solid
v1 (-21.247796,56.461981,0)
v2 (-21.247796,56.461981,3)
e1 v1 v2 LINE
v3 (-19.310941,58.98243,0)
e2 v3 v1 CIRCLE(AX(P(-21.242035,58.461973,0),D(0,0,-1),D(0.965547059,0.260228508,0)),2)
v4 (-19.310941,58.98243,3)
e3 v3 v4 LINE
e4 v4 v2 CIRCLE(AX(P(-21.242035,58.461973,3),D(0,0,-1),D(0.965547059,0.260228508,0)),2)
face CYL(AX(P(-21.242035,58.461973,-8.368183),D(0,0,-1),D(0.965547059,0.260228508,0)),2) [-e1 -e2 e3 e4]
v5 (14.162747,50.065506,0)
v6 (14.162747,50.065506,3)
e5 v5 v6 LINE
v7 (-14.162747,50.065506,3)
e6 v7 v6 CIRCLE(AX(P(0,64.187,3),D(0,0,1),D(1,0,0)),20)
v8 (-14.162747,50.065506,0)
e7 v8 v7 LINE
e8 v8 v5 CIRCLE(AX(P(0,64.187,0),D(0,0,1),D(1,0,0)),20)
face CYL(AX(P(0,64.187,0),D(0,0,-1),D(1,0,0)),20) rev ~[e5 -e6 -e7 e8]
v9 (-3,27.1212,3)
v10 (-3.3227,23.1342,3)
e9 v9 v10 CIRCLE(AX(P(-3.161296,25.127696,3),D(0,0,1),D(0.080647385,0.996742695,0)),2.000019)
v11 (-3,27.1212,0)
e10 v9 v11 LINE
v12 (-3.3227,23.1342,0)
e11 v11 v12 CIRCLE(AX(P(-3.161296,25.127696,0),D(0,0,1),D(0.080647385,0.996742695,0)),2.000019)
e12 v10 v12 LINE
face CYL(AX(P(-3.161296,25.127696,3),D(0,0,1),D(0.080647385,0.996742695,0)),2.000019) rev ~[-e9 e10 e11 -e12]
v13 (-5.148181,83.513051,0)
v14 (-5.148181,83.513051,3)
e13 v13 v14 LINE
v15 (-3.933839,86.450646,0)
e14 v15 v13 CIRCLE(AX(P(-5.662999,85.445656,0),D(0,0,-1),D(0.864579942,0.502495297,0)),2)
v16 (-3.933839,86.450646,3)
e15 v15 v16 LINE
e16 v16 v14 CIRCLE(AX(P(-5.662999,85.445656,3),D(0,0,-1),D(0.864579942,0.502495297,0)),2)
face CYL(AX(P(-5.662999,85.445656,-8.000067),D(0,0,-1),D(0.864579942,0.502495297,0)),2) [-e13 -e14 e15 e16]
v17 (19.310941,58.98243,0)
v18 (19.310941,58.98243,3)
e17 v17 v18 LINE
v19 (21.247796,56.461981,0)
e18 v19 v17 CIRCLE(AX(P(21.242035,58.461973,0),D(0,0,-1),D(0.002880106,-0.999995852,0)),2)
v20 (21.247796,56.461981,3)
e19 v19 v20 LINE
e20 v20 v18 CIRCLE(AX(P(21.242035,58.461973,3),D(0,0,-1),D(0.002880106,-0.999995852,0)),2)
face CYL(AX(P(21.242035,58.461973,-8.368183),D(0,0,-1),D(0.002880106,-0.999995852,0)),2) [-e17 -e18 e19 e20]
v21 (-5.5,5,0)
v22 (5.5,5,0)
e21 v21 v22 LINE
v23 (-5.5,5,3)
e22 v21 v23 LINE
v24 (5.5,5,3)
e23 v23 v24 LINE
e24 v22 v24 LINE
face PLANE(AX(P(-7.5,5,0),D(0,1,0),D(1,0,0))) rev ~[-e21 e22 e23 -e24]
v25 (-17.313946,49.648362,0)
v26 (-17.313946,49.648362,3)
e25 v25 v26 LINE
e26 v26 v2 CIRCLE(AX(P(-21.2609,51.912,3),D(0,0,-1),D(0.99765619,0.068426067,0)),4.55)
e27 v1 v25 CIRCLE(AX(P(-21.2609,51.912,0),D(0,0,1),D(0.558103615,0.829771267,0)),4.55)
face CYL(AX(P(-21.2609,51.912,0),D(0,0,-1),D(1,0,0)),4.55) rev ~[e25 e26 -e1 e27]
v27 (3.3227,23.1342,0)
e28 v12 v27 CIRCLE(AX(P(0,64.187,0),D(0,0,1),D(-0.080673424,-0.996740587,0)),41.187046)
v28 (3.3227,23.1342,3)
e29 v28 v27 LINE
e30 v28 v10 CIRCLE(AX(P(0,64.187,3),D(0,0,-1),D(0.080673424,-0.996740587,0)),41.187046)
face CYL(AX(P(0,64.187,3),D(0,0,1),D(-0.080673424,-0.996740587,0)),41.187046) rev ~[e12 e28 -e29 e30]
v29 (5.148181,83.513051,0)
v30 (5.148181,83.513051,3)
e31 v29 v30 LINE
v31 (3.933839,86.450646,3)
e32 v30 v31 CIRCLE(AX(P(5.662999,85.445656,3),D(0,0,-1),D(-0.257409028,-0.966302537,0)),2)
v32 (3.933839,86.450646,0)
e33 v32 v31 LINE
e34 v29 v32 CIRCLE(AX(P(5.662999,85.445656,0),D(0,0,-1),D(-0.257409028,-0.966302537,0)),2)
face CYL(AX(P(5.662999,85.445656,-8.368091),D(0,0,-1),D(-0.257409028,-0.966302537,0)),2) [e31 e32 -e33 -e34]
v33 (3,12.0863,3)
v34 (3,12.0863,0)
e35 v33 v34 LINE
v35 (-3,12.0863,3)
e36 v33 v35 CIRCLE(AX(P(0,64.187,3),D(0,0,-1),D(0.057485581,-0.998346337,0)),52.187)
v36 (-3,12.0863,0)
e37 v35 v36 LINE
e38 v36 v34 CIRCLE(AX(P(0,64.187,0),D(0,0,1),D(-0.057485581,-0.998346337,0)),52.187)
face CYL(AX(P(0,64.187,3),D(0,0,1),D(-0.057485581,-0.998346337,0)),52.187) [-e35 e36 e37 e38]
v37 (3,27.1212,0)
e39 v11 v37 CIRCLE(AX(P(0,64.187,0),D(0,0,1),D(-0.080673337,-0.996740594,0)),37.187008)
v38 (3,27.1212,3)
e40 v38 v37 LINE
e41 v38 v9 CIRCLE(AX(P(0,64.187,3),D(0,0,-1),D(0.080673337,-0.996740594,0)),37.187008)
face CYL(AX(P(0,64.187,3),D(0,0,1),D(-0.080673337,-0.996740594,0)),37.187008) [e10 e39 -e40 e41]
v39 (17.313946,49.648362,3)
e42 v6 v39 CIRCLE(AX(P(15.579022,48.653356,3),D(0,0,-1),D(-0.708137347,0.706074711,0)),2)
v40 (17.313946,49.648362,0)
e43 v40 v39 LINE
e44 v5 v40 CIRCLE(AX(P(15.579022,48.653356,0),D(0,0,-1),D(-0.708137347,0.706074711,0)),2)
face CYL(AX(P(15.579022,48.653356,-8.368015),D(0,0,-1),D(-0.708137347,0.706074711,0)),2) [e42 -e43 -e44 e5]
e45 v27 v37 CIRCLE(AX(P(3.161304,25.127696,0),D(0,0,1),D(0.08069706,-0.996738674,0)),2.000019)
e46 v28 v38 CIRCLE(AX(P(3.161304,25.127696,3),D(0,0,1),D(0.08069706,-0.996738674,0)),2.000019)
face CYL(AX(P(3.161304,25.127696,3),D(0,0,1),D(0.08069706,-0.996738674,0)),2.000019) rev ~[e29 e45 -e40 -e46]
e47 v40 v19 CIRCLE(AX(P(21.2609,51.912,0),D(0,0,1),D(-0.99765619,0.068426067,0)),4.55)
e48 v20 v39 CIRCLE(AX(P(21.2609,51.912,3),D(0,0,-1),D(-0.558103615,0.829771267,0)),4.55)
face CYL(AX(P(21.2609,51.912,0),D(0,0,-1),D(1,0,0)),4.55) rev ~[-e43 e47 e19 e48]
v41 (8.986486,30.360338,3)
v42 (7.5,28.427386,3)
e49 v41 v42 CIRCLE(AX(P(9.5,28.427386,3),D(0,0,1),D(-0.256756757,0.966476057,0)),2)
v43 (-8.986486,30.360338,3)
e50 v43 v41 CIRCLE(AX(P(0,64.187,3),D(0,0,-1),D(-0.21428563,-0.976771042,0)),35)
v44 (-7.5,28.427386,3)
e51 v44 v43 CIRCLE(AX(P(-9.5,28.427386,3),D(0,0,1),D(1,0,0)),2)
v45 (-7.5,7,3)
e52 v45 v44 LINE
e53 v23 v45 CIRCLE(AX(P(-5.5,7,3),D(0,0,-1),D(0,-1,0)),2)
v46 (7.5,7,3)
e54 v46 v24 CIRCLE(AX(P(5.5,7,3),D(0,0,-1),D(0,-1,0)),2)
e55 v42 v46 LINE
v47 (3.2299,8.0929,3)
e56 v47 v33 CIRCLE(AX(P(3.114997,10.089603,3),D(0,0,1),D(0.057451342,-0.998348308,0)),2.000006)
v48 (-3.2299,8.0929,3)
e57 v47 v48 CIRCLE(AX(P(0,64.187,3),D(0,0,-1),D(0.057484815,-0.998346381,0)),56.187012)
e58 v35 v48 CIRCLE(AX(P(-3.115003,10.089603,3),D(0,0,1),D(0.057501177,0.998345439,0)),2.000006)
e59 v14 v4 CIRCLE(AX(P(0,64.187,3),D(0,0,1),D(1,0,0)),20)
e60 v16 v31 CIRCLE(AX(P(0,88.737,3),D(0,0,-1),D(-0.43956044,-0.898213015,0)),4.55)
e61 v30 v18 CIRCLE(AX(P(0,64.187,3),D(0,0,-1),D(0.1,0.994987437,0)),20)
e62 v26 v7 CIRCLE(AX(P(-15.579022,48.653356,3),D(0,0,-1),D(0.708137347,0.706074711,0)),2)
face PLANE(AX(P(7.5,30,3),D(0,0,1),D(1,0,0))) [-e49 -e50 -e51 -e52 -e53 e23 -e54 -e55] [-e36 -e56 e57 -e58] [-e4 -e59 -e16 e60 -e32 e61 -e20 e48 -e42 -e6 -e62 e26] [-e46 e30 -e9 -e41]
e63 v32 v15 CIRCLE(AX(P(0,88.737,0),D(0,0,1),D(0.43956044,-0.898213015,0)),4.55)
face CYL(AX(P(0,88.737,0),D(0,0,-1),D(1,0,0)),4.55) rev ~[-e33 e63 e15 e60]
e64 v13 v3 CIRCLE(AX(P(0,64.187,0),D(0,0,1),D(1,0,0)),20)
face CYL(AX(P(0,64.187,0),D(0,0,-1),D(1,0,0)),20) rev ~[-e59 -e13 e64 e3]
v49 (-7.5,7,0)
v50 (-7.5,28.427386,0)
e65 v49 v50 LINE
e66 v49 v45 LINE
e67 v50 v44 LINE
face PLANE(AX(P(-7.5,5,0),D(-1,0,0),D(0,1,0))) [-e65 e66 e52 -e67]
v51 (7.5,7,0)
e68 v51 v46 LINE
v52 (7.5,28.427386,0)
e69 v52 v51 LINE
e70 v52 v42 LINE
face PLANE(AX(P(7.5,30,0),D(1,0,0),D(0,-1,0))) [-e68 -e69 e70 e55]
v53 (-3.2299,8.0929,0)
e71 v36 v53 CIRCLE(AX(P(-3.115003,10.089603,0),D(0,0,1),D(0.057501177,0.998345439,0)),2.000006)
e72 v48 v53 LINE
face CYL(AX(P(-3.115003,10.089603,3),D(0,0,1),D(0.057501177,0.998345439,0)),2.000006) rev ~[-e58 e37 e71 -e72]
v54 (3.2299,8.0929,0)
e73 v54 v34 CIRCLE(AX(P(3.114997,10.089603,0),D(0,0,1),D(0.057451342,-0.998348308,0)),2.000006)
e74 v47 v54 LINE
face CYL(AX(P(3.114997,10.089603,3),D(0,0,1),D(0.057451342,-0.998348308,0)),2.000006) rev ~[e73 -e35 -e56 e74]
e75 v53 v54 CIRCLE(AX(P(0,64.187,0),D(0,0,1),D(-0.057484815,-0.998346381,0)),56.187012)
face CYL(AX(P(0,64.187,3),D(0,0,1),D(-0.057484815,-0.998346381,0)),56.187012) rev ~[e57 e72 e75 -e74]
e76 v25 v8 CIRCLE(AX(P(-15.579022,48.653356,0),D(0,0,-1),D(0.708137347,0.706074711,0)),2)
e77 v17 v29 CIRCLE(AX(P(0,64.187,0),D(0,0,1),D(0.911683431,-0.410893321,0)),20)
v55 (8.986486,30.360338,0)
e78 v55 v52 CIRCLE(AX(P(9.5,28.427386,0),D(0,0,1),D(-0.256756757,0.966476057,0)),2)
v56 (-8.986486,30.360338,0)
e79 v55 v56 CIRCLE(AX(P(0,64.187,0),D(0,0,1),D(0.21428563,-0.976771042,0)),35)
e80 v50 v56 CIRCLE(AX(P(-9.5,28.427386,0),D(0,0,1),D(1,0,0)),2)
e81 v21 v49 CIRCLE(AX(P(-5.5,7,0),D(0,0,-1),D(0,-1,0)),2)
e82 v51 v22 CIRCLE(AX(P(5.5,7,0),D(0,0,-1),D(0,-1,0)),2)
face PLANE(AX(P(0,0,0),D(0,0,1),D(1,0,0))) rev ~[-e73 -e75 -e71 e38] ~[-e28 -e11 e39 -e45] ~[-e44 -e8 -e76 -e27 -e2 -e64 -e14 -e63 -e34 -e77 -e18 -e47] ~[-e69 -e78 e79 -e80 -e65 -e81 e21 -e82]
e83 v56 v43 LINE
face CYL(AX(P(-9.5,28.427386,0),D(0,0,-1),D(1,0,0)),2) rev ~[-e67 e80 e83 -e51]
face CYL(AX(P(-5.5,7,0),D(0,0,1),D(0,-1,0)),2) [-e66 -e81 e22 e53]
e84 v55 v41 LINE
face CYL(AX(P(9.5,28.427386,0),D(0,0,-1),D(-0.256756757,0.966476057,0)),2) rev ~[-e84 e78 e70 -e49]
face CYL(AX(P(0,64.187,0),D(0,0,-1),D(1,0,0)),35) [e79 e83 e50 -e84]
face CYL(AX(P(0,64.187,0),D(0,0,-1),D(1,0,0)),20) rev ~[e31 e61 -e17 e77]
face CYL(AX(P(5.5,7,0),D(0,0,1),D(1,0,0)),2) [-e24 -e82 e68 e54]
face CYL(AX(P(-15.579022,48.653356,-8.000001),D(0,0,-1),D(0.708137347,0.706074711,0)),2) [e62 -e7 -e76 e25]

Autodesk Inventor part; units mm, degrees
ref_plane "YZ Plane" through (0, 0, 0) normal (1, 0, 0) x (0, 1, 0)
ref_plane "XZ Plane" through (0, 0, 0) normal (0, 1, 0) x (-1, 0, 0)
ref_plane "XY Plane" through (0, 0, 0) normal (0, 0, 1) x (1, 0, 0)
sketch "Эскиз1" plane through (0, 0, 0) normal (0, 0, 1) x (1, 0, 0)
  line L0 (17.5, 5) -> (-17.5, 5) construction
  line L1 (-17.5, 5) -> (-17.5, -5) construction
  line L2 (-17.5, -5) -> (17.5, -5) construction
  line L3 (17.5, -5) -> (17.5, 5) construction
  line L4 (17.5, 5) -> (-17.5, -5) construction
  line L5 (-17.5, 5) -> (17.5, -5) construction
  line L6 (12.8471, 5) -> (-11.1661, 5) construction
  circle A0 centre (0, 64.187) radius 35
  circle A1 centre (0, 64.187) radius 20
  line L7 (0, 64.187) -> (0, 0) construction
  circle A2 centre (0, 88.737) radius 4.55
  line L8 (-7.5, 5) -> (-7.5, 30)
  line L9 (7.5, 30) -> (7.5, 5)
  line L10 (-2, 49.2906) -> (2, 49.2906) construction
  line L11 (-7.5, 5) -> (7.5, 5)
  line L12 (-2, 85.687) -> (2, 85.687)
  line L13 (2, 85.687) -> (2, 82.687)
  line L14 (2, 82.687) -> (-2, 82.687)
  line L15 (-2, 82.687) -> (-2, 85.687)
  line L16 (-2, 85.687) -> (2, 82.687) construction
  line L17 (2, 85.687) -> (-2, 82.687) construction
  line L18 (-17.6195, 51.7049) -> (-19.6195, 55.169)
  circle A3 centre (-21.2609, 51.912) radius 4.55
  line L19 (-17.0215, 56.669) -> (-15.0215, 53.2049)
  line L20 (-19.6195, 55.169) -> (-17.0215, 56.669)
  line L21 (-15.0215, 53.2049) -> (-17.6195, 51.7049)
  line L22 (19.6195, 55.169) -> (17.6195, 51.7049)
  circle A4 centre (21.2609, 51.912) radius 4.55
  line L23 (15.0215, 53.2049) -> (17.0215, 56.669)
  line L24 (17.6195, 51.7049) -> (15.0215, 53.2049)
  line L25 (17.0215, 56.669) -> (19.6195, 55.169)
  point P0 (0, 89.2906)
  point P1 (0, 84.187)
  point P2 (-17.3205, 54.187)
  point P3 (17.3205, 54.187)
  point P4 (18.2337, 55.9692)
  point P5 (18.7216, 55.6875)
  point P6 (16.7216, 52.2234)
  point P7 (16.2337, 52.5051)
  point P8 (-16.2337, 52.5051)
  point P9 (-16.7216, 52.2234)
  point P10 (-18.7216, 55.6875)
  point P11 (-18.2337, 55.9692)
  point P12 (-2, 84.0867)
  point P13 (-2, 84.6501)
  point P14 (2, 84.6501)
  point P15 (2, 84.0867)
  dimension "d3" = 40
  dimension "d4" = 9.1
  dimension "d0" = 70
  dimension "d9" = 35
  dimension "d10" = 25
  dimension "d11" = 10
  dimension "d12" = 15
  dimension "d14" = 7.5
  dimension "d30" = 4
  dimension "d31" = 3
  dimension "d34" = 360
extrude "Выдавливание1" add sketch "Эскиз1" along normal blind 3
fillet "Сопряжение1" radius 2 14 edges at (-7.5, 30, 1.5) (7.5, 30, 1.5) (-18.2337, 55.9692, 1.5) (-18.7216, 55.6875, 1.5) (-16.2337, 52.5051, 1.5) (-16.7216, 52.2234, 1.5) (-2, 84.0867, 1.5) (-2, 84.6501, 1.5) (2, 84.0867, 1.5) (2, 84.6501, 1.5) (18.7216, 55.6875, 1.5) (18.2337, 55.9692, 1.5) (16.7216, 52.2234, 1.5) (16.2337, 52.5051, 1.5)
sketch "Эскиз2" plane through (0, 0, 3) normal (0, 0, 1) x (1, 0, 0)
  circle A0 centre (0, 25) radius 2 construction
  circle A1 centre (0, 10) radius 2 construction
  line L0 (0, 0) -> (0, 43.9437)
  line L1 (0, 10) -> (0, 5)
  line L2 (-7.5, 5) -> (7.5, 5) projected
  arc A2 (19.3109, 58.9824) -> (5.1482, 83.513) centre (0, 64.187) ccw projected
  arc A3 (-3.1613, 25.1277) -> (3.1613, 25.1277) centre (0, 64.187) ccw construction
  arc A4 (-3.3227, 23.1342) -> (3.3227, 23.1342) centre (0, 64.187) ccw
  arc A5 (-3, 27.1212) -> (3, 27.1212) centre (0, 64.187) ccw
  arc A6 (-3, 27.1212) -> (-3.3227, 23.1342) centre (-3.1613, 25.1277) ccw
  arc A7 (3.3227, 23.1342) -> (3, 27.1212) centre (3.1613, 25.1277) ccw
  arc A8 (-3.115, 10.0896) -> (3.115, 10.0896) centre (0, 64.187) ccw construction
  arc A9 (-3.2299, 8.0929) -> (3.2299, 8.0929) centre (0, 64.187) ccw
  arc A10 (-3, 12.0863) -> (3, 12.0863) centre (0, 64.187) ccw
  arc A11 (-3, 12.0863) -> (-3.2299, 8.0929) centre (-3.115, 10.0896) ccw
  arc A12 (3.2299, 8.0929) -> (3, 12.0863) centre (3.115, 10.0896) ccw
  dimension "d24" = 15
  dimension "d25" = 5
  dimension "d26" = 4
  dimension "d27" = 4
  dimension "d39" = 4
  dimension "d40" = 6
  dimension "d41" = 4
  dimension "d42" = 6
extrude "Выдавливание2" cut sketch "Эскиз2" against normal blind 4
fillet "Сопряжение2" radius 2 2 edges at (7.5, 5, 1.5) (-7.5, 5, 1.5)
properties part number "Деталь2_мозговорот"
